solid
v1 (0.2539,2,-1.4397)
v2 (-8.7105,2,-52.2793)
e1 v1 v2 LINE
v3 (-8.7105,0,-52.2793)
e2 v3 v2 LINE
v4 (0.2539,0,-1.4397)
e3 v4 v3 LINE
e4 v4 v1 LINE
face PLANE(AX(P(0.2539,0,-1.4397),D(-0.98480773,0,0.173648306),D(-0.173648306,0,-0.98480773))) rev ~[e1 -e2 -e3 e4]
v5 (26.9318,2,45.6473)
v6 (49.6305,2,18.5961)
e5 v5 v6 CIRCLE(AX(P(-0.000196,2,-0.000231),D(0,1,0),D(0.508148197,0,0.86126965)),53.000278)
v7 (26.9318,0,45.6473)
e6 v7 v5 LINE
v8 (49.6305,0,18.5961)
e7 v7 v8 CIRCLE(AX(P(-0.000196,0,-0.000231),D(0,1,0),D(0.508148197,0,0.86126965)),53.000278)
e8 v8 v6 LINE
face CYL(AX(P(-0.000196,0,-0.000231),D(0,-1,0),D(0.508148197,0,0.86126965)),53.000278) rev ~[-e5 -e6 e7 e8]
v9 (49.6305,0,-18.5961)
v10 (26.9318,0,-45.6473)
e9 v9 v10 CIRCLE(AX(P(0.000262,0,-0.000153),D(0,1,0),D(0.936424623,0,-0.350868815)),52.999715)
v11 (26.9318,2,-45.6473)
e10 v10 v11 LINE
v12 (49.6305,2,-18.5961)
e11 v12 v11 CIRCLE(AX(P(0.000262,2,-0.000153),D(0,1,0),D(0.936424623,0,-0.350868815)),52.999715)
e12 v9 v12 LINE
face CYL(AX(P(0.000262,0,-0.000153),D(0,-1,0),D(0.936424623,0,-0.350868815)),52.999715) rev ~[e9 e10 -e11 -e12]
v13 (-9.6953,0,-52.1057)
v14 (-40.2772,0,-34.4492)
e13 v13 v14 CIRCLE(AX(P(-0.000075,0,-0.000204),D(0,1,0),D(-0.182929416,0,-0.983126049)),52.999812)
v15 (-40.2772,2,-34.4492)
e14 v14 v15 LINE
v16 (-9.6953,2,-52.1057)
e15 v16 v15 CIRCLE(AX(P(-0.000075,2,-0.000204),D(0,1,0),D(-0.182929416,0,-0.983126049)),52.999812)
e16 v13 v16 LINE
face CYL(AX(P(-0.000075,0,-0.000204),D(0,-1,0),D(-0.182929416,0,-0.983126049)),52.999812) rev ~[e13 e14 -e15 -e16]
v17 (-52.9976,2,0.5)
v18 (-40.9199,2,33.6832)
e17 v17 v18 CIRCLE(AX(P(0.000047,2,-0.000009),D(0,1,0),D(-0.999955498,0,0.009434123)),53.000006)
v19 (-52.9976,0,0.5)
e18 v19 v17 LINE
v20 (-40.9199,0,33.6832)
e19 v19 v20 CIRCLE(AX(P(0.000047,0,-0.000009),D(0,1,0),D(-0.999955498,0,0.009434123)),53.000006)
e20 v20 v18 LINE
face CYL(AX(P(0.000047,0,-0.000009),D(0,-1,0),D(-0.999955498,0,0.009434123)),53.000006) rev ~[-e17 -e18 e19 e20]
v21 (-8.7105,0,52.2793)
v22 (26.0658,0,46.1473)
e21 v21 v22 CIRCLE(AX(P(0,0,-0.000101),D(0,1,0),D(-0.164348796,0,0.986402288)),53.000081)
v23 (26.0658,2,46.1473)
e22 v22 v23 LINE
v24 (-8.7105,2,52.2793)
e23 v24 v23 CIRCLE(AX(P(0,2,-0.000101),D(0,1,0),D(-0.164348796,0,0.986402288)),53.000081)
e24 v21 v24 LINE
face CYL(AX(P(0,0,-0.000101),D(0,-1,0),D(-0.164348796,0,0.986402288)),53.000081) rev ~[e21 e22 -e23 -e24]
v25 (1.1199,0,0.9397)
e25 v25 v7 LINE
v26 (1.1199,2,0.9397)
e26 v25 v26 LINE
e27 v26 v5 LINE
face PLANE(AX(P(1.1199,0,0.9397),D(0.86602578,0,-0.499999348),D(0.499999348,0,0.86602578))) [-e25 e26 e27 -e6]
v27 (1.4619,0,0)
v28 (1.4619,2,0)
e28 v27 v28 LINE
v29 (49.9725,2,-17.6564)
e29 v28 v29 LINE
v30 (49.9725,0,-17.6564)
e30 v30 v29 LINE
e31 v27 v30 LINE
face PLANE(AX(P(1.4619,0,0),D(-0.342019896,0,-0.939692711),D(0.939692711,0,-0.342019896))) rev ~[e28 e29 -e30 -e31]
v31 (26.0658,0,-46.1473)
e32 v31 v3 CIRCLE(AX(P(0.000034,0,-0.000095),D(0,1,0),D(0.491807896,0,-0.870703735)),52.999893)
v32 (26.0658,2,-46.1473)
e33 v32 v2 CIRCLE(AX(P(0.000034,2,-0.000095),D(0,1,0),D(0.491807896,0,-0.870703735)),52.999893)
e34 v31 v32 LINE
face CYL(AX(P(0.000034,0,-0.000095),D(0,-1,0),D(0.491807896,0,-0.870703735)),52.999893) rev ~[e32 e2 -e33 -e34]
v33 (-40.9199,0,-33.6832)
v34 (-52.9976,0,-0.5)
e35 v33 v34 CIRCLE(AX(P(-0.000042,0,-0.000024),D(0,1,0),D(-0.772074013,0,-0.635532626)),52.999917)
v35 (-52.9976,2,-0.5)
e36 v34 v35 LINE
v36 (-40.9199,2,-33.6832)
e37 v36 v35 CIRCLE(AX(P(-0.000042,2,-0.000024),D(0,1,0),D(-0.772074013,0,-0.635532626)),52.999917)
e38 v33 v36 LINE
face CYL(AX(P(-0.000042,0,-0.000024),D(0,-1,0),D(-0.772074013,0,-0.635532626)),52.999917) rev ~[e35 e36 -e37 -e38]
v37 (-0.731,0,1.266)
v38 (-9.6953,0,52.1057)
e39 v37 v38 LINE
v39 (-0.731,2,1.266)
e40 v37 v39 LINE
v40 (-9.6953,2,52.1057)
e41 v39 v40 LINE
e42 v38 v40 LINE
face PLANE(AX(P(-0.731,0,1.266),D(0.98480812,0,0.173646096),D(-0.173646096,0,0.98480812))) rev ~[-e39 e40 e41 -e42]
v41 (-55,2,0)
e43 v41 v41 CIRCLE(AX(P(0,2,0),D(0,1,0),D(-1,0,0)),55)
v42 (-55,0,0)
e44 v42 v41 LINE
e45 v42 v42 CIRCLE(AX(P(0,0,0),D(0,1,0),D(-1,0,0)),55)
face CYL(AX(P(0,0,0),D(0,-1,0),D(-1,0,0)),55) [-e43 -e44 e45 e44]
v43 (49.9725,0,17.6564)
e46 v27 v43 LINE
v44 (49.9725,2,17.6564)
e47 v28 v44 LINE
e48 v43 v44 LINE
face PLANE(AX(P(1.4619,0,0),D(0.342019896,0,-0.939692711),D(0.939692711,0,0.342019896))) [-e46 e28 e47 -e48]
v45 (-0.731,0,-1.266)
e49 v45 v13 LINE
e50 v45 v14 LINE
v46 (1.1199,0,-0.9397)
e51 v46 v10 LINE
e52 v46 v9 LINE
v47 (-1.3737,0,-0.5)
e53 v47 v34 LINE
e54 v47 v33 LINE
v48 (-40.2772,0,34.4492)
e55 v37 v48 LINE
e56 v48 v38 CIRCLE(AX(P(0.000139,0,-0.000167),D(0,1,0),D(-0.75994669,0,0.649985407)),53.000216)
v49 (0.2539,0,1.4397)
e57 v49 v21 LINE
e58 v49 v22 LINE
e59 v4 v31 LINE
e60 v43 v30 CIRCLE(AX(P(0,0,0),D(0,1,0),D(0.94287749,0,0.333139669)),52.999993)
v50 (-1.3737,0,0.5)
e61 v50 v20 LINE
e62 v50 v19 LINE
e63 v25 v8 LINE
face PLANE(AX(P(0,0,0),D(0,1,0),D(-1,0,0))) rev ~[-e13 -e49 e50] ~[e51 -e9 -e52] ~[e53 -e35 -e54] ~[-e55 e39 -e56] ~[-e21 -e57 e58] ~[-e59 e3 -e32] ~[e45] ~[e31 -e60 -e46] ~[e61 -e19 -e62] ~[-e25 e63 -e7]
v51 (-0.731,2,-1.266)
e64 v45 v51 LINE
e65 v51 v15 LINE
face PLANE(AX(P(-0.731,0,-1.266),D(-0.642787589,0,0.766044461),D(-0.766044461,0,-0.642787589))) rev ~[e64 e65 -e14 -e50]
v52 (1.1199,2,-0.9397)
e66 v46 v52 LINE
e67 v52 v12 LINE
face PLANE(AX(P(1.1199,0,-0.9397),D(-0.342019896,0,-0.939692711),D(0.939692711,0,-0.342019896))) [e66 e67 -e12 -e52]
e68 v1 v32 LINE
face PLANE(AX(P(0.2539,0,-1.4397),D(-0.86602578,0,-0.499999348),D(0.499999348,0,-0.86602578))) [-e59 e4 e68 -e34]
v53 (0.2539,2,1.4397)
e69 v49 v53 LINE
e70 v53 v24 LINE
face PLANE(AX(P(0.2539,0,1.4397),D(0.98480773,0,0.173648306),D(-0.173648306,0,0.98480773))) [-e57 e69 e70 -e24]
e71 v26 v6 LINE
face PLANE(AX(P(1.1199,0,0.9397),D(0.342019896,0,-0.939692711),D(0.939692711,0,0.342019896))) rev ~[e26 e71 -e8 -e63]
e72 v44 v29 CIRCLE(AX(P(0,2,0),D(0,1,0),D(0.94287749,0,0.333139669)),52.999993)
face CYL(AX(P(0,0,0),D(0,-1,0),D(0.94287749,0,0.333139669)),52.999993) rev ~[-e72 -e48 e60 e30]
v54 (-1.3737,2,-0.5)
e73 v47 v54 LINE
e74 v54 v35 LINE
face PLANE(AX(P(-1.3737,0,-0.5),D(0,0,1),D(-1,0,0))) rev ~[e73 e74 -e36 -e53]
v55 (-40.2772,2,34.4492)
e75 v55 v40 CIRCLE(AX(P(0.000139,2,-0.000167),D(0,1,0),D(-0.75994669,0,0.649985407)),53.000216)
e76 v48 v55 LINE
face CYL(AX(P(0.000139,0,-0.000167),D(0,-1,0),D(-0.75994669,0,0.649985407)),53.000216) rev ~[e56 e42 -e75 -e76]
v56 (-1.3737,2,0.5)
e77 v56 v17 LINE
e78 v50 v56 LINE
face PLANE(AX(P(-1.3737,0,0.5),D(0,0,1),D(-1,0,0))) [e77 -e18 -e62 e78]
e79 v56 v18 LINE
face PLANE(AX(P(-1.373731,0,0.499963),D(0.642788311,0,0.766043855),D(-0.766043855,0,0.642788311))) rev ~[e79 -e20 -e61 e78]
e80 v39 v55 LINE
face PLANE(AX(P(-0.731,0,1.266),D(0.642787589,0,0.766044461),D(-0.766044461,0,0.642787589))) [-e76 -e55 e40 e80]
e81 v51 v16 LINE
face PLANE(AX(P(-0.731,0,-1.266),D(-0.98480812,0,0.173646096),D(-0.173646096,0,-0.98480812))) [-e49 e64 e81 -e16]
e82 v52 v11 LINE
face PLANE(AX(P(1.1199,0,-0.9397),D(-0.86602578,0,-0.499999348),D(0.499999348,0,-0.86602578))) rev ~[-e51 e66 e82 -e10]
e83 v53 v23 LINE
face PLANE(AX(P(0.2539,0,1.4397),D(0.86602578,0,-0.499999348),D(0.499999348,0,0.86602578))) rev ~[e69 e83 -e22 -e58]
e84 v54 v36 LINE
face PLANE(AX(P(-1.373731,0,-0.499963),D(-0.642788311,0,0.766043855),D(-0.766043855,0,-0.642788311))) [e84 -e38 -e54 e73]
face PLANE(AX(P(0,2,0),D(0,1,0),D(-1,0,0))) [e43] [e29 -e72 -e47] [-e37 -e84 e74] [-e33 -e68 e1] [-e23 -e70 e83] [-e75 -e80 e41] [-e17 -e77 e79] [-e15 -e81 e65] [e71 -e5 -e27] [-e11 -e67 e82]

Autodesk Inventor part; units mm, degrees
ref_plane "YZ Plane" through (0, 0, 0) normal (1, 0, 0) x (0, 1, 0)
ref_plane "XZ Plane" through (0, 0, 0) normal (0, 1, 0) x (-1, 0, 0)
ref_plane "XY Plane" through (0, 0, 0) normal (0, 0, 1) x (1, 0, 0)
sketch "Эскиз1" plane through (0, 0, 0) normal (0, 1, 0) x (-1, 0, 0)
  circle A0 centre (0, 0) radius 55
  line L0 (0, 0) -> (0, -0.5)
  line L1 (0, 0) -> (0, 0.5)
  line L2 (1.3737, 0.5) -> (52.9976, 0.5)
  arc A1 (52.9976, 0.5) -> (40.9199, 33.6832) centre (0, 0) ccw
  arc A2 (40.2772, 34.4492) -> (9.6953, 52.1057) centre (0, 0) ccw
  arc A3 (8.7105, 52.2793) -> (-26.0658, 46.1473) centre (0, 0) ccw
  arc A4 (-26.9318, 45.6473) -> (-49.6305, 18.5961) centre (0, 0) ccw
  arc A5 (-49.9725, 17.6564) -> (-49.9725, -17.6564) centre (0, 0) ccw
  arc A6 (-49.6305, -18.5961) -> (-26.9318, -45.6473) centre (0, 0) ccw
  arc A7 (-26.0658, -46.1473) -> (8.7105, -52.2793) centre (0, 0) ccw
  arc A8 (9.6953, -52.1057) -> (40.2772, -34.4492) centre (0, 0) ccw
  arc A9 (40.9199, -33.6832) -> (52.9976, -0.5) centre (0, 0) ccw
  line L3 (-1.1199, 0.9397) -> (-49.6305, 18.5961)
  line L4 (-1.1199, 0.9397) -> (-26.9318, 45.6473)
  line L5 (-1.4619, 0) -> (-49.9725, -17.6564)
  line L6 (-1.4619, 0) -> (-49.9725, 17.6564)
  line L7 (-1.1199, -0.9397) -> (-26.9318, -45.6473)
  line L8 (0.0882, -0.5) -> (0, -0.5321)
  line L9 (-1.1199, -0.9397) -> (-49.6305, -18.5961)
  line L10 (-0.2539, -1.4397) -> (8.7105, -52.2793)
  line L11 (0.731, -1.266) -> (40.2772, -34.4492)
  line L12 (0.3889, -0.3264) -> (0.342, -0.4076)
  line L13 (-0.2539, -1.4397) -> (-26.0658, -46.1473)
  line L14 (0.731, -1.266) -> (9.6953, -52.1057)
  line L15 (0.3214, -0.383) -> (0.3889, -0.3264)
  line L16 (0.7779, 0) -> (40.9199, 33.6832)
  line L17 (0.7779, 0) -> (40.9199, -33.6832)
  line L18 (0.731, 1.266) -> (9.6953, 52.1057)
  line L19 (0.731, 1.266) -> (40.2772, 34.4492)
  line L20 (-0.2539, 1.4397) -> (-26.0658, 46.1473)
  line L21 (-0.2539, 1.4397) -> (8.7105, 52.2793)
  line L22 (0, -0.5) -> (0.0882, -0.5)
  line L23 (1.3737, -0.5) -> (52.9976, -0.5)
  dimension "d0" = 110
  dimension "d2" = 0.5
  dimension "d3" = 0.5
extrude "Выдавливание1" add sketch "Эскиз1" along normal blind 2
